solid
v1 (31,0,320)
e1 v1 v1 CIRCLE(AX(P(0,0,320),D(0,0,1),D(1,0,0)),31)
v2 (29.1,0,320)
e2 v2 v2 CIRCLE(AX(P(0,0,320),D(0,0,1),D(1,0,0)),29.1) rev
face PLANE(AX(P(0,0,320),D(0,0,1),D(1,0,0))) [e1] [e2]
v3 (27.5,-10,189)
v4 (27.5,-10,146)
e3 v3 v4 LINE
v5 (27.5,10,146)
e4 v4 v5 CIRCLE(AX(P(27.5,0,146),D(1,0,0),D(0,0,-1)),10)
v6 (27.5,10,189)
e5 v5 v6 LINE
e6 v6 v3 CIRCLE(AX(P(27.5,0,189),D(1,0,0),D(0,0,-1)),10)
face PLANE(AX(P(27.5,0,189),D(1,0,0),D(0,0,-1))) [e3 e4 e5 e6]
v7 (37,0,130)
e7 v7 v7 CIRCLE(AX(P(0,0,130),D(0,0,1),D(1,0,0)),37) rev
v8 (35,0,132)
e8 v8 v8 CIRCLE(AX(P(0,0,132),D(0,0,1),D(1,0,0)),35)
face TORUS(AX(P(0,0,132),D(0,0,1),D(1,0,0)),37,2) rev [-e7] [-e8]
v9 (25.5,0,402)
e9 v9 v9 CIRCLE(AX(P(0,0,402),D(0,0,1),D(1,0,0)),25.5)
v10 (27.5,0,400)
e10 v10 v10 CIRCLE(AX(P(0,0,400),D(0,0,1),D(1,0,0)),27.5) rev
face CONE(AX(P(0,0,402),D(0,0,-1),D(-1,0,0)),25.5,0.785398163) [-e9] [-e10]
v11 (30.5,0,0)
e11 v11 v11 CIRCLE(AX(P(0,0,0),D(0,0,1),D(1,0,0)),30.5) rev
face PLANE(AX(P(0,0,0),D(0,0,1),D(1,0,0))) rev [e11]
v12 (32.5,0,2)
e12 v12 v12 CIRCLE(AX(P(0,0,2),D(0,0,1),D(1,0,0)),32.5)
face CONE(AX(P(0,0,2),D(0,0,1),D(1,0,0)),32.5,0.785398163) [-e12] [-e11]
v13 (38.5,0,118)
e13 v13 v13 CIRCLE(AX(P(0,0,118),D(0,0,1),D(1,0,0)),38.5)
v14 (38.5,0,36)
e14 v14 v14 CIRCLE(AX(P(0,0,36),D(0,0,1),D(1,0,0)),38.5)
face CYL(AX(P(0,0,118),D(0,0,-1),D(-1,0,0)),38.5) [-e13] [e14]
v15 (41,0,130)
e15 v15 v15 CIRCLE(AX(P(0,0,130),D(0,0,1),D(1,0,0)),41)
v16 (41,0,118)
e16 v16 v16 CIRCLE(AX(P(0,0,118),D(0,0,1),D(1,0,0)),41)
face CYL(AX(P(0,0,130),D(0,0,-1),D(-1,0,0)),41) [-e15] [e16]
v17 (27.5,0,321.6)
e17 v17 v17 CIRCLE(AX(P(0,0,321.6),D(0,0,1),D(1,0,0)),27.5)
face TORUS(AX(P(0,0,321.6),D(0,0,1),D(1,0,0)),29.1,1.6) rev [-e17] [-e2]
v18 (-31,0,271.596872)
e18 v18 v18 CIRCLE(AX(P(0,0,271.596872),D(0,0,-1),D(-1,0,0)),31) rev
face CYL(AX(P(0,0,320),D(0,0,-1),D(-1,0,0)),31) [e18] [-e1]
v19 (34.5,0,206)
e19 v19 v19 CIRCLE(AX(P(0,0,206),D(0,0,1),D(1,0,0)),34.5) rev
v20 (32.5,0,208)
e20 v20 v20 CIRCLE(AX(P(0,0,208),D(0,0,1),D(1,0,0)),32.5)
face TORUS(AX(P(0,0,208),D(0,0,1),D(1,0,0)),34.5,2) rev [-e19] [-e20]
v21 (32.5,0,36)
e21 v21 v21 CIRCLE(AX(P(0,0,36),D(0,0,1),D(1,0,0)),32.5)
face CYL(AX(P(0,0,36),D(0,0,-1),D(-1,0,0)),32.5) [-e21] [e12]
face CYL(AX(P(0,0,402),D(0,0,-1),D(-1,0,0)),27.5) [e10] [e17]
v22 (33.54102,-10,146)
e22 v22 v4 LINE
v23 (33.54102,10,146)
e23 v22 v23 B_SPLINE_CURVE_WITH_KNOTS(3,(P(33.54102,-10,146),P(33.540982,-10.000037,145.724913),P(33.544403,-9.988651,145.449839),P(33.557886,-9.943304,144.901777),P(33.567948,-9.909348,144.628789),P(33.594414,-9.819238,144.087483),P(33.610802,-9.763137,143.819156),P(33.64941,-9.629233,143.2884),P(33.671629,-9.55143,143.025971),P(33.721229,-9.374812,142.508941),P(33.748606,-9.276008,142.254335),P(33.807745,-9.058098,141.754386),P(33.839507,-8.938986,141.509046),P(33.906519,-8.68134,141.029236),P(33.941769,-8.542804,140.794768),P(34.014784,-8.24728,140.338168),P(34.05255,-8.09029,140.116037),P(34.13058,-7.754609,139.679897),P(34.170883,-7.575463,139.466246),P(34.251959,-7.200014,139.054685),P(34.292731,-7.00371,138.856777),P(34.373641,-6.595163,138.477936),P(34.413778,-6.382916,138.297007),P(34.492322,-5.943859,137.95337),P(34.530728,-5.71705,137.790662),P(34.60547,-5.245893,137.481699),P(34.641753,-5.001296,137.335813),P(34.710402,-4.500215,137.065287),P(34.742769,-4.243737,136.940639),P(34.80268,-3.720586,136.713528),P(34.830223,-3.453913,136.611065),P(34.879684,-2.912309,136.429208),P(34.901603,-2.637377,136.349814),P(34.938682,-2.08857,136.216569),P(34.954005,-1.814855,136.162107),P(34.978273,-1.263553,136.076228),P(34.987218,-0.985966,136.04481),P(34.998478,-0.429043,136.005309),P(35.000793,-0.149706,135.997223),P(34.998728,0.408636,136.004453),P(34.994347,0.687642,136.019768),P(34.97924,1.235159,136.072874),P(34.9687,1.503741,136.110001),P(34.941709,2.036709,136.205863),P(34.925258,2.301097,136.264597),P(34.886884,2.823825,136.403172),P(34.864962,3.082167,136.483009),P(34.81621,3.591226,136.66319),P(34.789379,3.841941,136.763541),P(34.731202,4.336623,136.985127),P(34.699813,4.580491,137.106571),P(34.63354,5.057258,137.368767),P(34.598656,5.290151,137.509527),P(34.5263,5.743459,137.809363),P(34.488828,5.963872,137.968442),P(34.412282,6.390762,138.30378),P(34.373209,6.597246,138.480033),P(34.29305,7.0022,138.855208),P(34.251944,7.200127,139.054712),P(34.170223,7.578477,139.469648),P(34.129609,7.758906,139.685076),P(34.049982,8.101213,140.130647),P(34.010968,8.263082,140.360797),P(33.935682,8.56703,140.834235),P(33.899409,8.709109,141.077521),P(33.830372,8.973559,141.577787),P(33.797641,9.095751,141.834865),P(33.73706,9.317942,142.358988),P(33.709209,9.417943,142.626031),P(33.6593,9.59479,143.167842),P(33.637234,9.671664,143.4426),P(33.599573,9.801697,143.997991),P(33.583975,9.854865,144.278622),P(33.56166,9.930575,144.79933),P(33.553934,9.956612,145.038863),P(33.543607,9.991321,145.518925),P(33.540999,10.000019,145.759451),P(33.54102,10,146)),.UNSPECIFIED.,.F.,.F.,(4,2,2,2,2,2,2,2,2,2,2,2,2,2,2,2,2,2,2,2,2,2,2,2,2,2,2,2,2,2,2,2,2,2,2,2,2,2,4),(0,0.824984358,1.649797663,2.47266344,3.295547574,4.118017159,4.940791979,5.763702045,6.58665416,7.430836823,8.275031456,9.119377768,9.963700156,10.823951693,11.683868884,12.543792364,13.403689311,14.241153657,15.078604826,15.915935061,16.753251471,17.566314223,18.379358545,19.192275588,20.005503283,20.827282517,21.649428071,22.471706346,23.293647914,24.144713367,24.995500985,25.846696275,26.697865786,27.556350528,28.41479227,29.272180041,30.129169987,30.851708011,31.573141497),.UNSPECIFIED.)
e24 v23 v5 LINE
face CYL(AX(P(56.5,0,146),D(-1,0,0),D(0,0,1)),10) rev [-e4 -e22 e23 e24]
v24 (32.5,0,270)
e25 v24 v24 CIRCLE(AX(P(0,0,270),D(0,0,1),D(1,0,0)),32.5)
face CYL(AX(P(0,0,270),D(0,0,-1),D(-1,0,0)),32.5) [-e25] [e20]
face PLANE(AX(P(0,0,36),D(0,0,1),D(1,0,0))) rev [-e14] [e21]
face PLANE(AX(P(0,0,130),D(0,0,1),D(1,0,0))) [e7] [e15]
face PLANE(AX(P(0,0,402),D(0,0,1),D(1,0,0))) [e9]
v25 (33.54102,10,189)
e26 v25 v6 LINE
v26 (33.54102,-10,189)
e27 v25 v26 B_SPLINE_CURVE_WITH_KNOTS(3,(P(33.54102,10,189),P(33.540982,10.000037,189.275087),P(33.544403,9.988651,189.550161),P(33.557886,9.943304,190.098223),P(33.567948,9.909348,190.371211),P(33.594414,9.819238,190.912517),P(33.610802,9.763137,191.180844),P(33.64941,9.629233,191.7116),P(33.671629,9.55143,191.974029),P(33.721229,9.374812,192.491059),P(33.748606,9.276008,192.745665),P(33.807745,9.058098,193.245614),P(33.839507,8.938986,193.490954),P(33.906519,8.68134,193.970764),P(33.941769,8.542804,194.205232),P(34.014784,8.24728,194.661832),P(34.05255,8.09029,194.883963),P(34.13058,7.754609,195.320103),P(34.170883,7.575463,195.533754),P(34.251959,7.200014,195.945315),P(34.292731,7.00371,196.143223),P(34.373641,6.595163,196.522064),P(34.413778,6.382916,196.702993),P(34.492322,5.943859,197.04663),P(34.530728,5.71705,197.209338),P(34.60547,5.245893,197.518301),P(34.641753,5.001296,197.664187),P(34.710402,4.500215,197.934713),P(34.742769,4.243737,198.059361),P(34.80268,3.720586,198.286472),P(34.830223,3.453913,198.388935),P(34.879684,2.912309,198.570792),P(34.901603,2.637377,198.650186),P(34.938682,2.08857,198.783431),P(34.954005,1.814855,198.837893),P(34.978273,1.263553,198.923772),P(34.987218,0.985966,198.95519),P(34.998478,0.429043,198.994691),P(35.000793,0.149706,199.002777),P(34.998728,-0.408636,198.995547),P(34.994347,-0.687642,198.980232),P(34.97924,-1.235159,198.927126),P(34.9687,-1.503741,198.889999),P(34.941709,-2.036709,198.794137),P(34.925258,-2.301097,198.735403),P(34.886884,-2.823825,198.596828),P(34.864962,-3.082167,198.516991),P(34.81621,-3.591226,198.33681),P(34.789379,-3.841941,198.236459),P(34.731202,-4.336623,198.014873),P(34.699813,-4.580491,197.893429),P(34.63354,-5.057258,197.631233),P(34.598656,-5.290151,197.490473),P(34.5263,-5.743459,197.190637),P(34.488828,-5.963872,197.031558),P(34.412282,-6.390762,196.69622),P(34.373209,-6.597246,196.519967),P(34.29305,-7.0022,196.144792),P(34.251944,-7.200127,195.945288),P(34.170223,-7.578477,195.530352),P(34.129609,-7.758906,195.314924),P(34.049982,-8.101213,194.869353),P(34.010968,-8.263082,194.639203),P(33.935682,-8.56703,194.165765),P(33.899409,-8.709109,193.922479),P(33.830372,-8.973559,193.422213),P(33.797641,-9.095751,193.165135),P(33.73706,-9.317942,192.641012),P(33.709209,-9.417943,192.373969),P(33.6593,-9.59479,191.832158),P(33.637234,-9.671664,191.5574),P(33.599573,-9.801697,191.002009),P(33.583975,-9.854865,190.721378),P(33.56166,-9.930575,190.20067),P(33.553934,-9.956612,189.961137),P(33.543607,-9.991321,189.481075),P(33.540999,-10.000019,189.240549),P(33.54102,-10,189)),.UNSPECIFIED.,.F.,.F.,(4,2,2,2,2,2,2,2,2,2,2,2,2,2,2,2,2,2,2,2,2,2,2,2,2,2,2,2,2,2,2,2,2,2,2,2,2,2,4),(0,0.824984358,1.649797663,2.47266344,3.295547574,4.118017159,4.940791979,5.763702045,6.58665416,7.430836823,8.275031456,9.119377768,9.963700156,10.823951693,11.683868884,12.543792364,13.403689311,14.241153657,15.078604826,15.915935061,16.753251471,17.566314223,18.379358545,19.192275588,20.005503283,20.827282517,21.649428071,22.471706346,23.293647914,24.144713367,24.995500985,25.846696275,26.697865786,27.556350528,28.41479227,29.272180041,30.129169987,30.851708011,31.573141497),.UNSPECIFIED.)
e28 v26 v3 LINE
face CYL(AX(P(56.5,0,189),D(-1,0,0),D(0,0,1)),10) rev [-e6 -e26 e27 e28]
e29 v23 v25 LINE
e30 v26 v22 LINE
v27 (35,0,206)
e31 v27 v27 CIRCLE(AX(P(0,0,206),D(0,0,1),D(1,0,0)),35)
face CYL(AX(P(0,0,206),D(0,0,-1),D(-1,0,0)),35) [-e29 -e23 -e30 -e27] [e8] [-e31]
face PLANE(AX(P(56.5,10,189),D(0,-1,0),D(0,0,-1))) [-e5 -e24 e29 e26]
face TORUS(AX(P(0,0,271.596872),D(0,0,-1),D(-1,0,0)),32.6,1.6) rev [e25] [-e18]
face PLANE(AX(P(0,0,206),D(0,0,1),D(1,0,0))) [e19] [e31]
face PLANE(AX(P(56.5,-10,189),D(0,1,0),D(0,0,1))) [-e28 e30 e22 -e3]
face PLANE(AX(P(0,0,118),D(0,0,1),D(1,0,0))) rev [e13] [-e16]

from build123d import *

# Parameters (mm, degrees)
SKETCH_1_R          = 32.5
EXTRUDE_1_DEPTH     = 36
SKETCH_2_R          = 38.5
EXTRUDE_2_DEPTH     = 82
SKETCH_3_R          = 41
EXTRUDE_3_DEPTH     = 12
SKETCH_4_R          = 35
EXTRUDE_4_DEPTH     = 76
SKETCH_5_R          = 32.5
EXTRUDE_5_DEPTH     = 64
SKETCH_6_R          = 31
EXTRUDE_6_DEPTH     = 50
SKETCH_7_R          = 27.5
EXTRUDE_7_DEPTH     = 82
FILLET_1_R          = 2
FILLET_2_R          = 1.6
CHAMFER_1_SIZE      = 2
CUT_EXTRUDE_1_DEPTH = 29


with BuildPart() as part:
    # 草图1 → 凸台-拉伸1 (new body)
    with BuildSketch(Plane.XY):
        Circle(SKETCH_1_R)
    extrude(amount=EXTRUDE_1_DEPTH)

    # 草图2 → 凸台-拉伸2 (add)
    with BuildSketch(Plane.XY.offset(36)):
        Circle(SKETCH_2_R)
    extrude(amount=EXTRUDE_2_DEPTH)

    # 草图3 → 凸台-拉伸3 (add)
    with BuildSketch(Plane.XY.offset(118)):
        Circle(SKETCH_3_R)
    extrude(amount=EXTRUDE_3_DEPTH)

    # 草图4 → 凸台-拉伸4 (add)
    with BuildSketch(Plane.XY.offset(130)):
        Circle(SKETCH_4_R)
    extrude(amount=EXTRUDE_4_DEPTH)

    # 草图5 → 凸台-拉伸5 (add)
    with BuildSketch(Plane.XY.offset(206)):
        Circle(SKETCH_5_R)
    extrude(amount=EXTRUDE_5_DEPTH)

    # 草图6 → 凸台-拉伸6 (add)
    with BuildSketch(Plane.XY.offset(270)):
        Circle(SKETCH_6_R)
    extrude(amount=EXTRUDE_6_DEPTH)

    # 草图7 → 凸台-拉伸7 (add)
    with BuildSketch(Plane.XY.offset(320)):
        Circle(SKETCH_7_R)
    extrude(amount=EXTRUDE_7_DEPTH)

    # 圆角1
    fillet_1_edges = [part.edges().sort_by_distance(p)[0] for p in [
        (-35, 0, 130),
        (-32.5, 0, 206),
    ]]
    fillet(fillet_1_edges, radius=FILLET_1_R)

    # 圆角2
    # the kernel refuses this fillet: 1.6 mm, written as the material it adds along each edge
    with BuildSketch(Plane(origin=(0, 0, 270), x_dir=(1, 0, 0), z_dir=(0, -1, 0))) as fillet_2_piece_1:
        with BuildLine():
            CenterArc((32.6, 1.596871942), FILLET_2_R, 180, 86.416678302)
            Line((31, 1.596871942), (30.968, 1.596871942))
            Line((30.968, 1.596871942), (30.968, 0))
            Line((30.968, 0), (31, -0.032))
            ThreePointArc((31, -0.032), (31.75, -0.032), (32.498, -0.031937439))
            Line((32.498, -0.031937439), (32.5, 0))
        make_face()
    revolve(axis=Axis((0, 0, 270), (0, 0, 1)))
    with BuildSketch(Plane(origin=(0, 0, 320), x_dir=(1, 0, 0), z_dir=(0, -1, 0))) as fillet_2_piece_2:
        with BuildLine():
            CenterArc((27.5 + FILLET_2_R, FILLET_2_R), FILLET_2_R, 180, 90)
            Line((27.5, FILLET_2_R), (27.5 - FILLET_2_R * 0.02, FILLET_2_R))
            Line((27.5 - FILLET_2_R * 0.02, FILLET_2_R), (27.5 - FILLET_2_R * 0.02, -FILLET_2_R * 0.02))
            Line((27.5 - FILLET_2_R * 0.02, -FILLET_2_R * 0.02), (27.5 + FILLET_2_R, -FILLET_2_R * 0.02))
            Line((27.5 + FILLET_2_R, -FILLET_2_R * 0.02), (27.5 + FILLET_2_R, 0))
        make_face()
    revolve(axis=Axis((0, 0, 320), (0, 0, 1)))

    # 倒角1
    chamfer_1_edges = [part.edges().sort_by_distance(p)[0] for p in [
        (-32.5, 0, 0),
        (-27.5, 0, 402),
    ]]
    chamfer(chamfer_1_edges, length=CHAMFER_1_SIZE)

    # 草图8 → 切除-拉伸1 (cut)
    with BuildSketch(Plane(origin=(27.5, 0, 0), x_dir=(0, 0, -1), z_dir=(1, 0, 0))):
        with BuildLine():
            Line((-189, 10), (-146, 10))
            ThreePointArc((-146, 10), (-136, 0), (-146, -10))
            Line((-146, -10), (-189, -10))
            ThreePointArc((-189, -10), (-199, 0), (-189, 10))
        make_face()
    extrude(amount=CUT_EXTRUDE_1_DEPTH, mode=Mode.SUBTRACT)


solid = part.part
